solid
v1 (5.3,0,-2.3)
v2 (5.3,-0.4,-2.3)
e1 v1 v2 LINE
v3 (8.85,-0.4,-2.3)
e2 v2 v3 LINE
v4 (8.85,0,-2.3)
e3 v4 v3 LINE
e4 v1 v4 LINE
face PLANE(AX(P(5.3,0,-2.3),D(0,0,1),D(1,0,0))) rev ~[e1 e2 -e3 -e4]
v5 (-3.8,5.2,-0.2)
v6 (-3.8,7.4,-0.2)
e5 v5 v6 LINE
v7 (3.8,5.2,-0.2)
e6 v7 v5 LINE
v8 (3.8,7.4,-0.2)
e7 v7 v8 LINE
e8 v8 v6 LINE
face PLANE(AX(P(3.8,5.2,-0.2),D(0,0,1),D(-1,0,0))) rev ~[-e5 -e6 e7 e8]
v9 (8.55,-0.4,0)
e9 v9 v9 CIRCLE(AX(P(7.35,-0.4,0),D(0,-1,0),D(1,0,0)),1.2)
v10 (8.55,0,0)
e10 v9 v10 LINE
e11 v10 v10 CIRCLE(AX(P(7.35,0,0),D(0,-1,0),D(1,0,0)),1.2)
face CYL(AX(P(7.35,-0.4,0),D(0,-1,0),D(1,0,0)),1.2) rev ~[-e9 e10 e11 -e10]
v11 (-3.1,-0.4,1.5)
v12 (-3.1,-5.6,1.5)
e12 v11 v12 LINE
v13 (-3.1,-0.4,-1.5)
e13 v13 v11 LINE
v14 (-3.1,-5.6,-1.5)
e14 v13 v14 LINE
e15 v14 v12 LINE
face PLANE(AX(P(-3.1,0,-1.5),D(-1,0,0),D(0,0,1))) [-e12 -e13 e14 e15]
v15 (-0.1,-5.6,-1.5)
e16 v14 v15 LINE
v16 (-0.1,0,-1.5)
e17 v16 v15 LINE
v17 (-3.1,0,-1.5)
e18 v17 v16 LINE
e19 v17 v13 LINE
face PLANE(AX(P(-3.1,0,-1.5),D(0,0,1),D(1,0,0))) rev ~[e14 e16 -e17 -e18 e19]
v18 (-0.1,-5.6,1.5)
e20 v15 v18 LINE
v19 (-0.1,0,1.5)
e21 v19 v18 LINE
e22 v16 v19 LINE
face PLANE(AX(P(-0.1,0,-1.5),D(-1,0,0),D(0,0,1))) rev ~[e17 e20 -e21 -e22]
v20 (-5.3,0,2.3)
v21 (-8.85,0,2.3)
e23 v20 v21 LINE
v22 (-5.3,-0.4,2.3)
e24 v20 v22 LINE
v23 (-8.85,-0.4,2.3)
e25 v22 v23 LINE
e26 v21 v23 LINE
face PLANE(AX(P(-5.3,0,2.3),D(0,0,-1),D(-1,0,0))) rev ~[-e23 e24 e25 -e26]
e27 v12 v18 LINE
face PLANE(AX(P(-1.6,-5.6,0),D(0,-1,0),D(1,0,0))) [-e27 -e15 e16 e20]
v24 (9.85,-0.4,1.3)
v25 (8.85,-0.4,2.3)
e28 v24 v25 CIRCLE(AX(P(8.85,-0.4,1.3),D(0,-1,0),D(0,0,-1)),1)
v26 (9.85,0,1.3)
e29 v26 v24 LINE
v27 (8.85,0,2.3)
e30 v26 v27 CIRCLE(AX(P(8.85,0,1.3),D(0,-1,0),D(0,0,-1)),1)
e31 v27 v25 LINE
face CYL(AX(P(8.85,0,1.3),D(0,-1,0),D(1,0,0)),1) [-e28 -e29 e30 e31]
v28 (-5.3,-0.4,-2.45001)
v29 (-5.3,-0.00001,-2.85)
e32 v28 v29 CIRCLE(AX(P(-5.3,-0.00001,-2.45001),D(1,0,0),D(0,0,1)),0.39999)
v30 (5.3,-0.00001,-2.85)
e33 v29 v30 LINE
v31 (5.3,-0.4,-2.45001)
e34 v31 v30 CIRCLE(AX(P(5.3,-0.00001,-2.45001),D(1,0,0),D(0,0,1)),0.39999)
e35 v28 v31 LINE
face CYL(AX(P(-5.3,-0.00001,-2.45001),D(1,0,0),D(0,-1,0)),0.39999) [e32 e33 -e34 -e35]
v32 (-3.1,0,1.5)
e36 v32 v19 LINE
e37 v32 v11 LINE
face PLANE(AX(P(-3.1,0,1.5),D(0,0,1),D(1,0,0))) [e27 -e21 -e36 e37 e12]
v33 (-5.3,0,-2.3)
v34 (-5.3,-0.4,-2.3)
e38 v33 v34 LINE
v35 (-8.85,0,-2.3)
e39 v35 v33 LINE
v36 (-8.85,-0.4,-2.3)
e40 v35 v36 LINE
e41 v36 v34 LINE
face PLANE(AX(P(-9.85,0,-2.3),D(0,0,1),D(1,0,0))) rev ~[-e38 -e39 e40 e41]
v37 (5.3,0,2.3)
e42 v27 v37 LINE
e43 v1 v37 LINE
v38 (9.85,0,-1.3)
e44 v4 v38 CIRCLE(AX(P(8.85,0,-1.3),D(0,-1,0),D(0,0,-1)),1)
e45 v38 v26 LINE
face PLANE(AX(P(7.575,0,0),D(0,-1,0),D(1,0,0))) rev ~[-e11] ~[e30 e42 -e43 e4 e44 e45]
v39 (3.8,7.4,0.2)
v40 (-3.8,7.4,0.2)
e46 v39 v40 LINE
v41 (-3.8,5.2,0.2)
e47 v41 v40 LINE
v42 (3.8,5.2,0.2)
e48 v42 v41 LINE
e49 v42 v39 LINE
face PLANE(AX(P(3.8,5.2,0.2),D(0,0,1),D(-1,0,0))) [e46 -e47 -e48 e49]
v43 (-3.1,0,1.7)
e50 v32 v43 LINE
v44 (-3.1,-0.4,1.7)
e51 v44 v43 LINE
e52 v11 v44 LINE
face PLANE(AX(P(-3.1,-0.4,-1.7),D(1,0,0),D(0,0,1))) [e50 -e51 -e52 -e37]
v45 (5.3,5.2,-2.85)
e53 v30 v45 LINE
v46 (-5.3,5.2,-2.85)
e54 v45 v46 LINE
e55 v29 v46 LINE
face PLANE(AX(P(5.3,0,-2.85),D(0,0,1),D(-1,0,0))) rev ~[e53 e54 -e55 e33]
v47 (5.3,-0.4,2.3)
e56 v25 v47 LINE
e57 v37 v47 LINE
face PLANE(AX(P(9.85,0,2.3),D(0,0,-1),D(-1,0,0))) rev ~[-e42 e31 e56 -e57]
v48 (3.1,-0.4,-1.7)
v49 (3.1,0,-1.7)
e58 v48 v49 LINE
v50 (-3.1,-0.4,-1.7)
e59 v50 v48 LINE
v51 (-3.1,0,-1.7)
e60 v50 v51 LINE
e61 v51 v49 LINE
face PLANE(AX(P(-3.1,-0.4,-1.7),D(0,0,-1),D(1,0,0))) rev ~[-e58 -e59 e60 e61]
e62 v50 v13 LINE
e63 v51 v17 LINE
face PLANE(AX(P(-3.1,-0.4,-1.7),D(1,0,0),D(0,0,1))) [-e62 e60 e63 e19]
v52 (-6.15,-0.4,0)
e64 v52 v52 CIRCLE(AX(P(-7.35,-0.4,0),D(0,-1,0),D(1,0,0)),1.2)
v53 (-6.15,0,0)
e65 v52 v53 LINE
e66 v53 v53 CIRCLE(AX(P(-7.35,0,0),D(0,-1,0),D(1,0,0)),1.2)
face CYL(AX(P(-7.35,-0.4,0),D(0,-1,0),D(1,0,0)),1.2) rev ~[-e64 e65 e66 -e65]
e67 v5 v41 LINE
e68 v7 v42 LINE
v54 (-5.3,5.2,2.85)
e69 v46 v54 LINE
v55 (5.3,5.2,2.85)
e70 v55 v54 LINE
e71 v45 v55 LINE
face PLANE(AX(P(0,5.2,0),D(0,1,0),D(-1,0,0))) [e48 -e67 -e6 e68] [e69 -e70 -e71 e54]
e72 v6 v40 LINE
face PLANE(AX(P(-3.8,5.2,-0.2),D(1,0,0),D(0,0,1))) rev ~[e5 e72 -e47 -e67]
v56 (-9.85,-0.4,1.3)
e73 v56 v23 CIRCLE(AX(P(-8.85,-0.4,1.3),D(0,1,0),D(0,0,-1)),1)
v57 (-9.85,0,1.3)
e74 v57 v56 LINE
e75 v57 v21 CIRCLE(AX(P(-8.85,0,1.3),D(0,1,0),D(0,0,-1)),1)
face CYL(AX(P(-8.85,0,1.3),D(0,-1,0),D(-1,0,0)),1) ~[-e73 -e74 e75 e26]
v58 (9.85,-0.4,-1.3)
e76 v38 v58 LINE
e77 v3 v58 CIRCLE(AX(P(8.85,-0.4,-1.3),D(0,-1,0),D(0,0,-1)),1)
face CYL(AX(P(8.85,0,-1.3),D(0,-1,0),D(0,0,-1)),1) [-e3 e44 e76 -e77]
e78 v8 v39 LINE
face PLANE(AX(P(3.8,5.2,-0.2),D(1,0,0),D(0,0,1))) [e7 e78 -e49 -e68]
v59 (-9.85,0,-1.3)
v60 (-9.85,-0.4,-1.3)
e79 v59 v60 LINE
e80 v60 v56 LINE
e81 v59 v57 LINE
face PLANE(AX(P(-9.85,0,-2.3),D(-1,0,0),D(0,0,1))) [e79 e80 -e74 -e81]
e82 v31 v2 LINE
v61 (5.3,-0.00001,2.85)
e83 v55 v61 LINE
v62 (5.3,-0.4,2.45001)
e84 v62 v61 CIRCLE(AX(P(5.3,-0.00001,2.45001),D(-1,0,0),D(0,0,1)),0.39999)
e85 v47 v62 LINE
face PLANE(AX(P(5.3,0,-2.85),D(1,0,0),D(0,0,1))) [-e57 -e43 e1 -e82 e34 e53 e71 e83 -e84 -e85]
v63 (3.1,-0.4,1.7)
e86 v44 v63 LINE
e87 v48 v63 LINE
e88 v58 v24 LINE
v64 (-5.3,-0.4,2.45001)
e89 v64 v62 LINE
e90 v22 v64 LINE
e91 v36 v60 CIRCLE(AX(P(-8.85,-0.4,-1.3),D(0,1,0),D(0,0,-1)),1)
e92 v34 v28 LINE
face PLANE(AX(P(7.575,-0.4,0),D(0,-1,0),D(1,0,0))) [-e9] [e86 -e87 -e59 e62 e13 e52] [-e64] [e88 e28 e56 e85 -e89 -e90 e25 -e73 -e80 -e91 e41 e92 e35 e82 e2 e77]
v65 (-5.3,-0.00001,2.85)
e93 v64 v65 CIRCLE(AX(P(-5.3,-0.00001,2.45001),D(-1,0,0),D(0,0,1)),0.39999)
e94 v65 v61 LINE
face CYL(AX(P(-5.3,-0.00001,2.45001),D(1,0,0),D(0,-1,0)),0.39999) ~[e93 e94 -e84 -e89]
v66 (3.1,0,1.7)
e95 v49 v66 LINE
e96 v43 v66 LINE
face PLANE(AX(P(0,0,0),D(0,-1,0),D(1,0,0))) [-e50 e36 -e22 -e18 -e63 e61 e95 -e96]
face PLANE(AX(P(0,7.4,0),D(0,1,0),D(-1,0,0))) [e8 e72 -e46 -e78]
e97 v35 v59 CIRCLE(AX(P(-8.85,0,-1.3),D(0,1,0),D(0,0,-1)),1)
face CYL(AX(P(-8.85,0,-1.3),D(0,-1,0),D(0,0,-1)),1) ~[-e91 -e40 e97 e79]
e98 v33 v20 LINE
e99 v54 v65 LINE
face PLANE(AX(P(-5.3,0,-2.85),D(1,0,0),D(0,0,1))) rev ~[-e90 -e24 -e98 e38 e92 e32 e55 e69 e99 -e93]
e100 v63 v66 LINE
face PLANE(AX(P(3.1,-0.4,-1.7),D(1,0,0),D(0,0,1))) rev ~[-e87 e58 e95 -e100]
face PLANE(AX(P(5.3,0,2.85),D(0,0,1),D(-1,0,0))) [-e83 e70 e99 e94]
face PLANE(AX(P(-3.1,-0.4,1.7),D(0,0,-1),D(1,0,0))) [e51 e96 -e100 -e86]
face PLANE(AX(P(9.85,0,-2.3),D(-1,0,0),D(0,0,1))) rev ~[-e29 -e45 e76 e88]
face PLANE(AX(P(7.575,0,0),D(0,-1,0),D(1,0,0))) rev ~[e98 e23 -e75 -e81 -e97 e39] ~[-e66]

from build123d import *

# Parameters (mm, degrees)
F0_W      = 4.55
F0_H      = 4.6
F0_W_2    = 10.6
F0_H_2    = 0.55
F1_DEPTH  = 0.4
F2_R      = 1.2
F3_DEPTH  = 0.5
F4_R      = 0.39999
F5_W      = 10.6
F5_H      = 5.7
F6_DEPTH  = 5.2
F7_R      = 1
F8_W      = 6.2
F8_H      = 3.4
F9_DEPTH  = 0.4
F10_W     = 3
F10_H     = 3
F11_DEPTH = 5.6
F12_W     = 7.6
F12_H     = 0.4
F13_DEPTH = 2.2


# Not quite as in the source:
# - a fillet or chamfer is up to 0.001 mm smaller than in the source, because OpenCascade refuses the exact size


with BuildPart() as f1:
    # F0 (on Front) → F1 (new body)
    with BuildSketch(Plane.XZ):
        with Locations((7.575, 0)):
            Rectangle(F0_W, F0_H)
        with Locations((0, -2.575)):
            Rectangle(F0_W_2, F0_H_2)
        Rectangle(F0_W_2, F0_H)
        with Locations((-7.575, 0)):
            Rectangle(F0_W, F0_H)
        with Locations((0, 2.575)):
            Rectangle(F0_W_2, F0_H_2)
    extrude(amount=F1_DEPTH)

    # F2 (on face) → F3 (cut)
    with BuildSketch(Plane.XZ.offset(0.4)):
        with Locations((-7.35, 0)):
            Circle(F2_R)
        with Locations((7.35, 0)):
            Circle(F2_R)
    extrude(amount=-F3_DEPTH, mode=Mode.SUBTRACT)

    # F4 (radius 0.4 in the source; OpenCascade refuses exactly that, so slightly less here)
    f4_edges = [f1.edges().sort_by_distance(p)[0] for p in [
        (0, -0.4, 2.85),
        (0, -0.4, -2.85),
    ]]
    fillet(f4_edges, radius=F4_R)

    # F5 (on face) → F6 (join)
    with BuildSketch(Plane(origin=(0, 0, 0), x_dir=(-1, 0, 0), z_dir=(0, 1, 0))):
        Rectangle(F5_W, F5_H)
    extrude(amount=F6_DEPTH)

    # F7
    f7_edges = [f1.edges().sort_by_distance(p)[0] for p in [
        (9.85, -0.2, 2.3),
        (9.85, -0.2, -2.3),
        (-9.85, -0.2, -2.3),
        (-9.85, -0.2, 2.3),
    ]]
    fillet(f7_edges, radius=F7_R)

    # F8 (on face) → F9 (cut)
    with BuildSketch(Plane.XZ.offset(0.4)):
        Rectangle(F8_W, F8_H)
    extrude(amount=-F9_DEPTH, mode=Mode.SUBTRACT)

    # F10 (on face) → F11 (join)
    with BuildSketch(Plane.XZ):
        with Locations((-1.6, 0)):
            Rectangle(F10_W, F10_H)
    extrude(amount=F11_DEPTH)

    # F12 (on face) → F13 (join)
    with BuildSketch(Plane(origin=(0, 5.2, 0), x_dir=(-1, 0, 0), z_dir=(0, 1, 0))):
        Rectangle(F12_W, F12_H)
    extrude(amount=F13_DEPTH)


solid = f1.part
